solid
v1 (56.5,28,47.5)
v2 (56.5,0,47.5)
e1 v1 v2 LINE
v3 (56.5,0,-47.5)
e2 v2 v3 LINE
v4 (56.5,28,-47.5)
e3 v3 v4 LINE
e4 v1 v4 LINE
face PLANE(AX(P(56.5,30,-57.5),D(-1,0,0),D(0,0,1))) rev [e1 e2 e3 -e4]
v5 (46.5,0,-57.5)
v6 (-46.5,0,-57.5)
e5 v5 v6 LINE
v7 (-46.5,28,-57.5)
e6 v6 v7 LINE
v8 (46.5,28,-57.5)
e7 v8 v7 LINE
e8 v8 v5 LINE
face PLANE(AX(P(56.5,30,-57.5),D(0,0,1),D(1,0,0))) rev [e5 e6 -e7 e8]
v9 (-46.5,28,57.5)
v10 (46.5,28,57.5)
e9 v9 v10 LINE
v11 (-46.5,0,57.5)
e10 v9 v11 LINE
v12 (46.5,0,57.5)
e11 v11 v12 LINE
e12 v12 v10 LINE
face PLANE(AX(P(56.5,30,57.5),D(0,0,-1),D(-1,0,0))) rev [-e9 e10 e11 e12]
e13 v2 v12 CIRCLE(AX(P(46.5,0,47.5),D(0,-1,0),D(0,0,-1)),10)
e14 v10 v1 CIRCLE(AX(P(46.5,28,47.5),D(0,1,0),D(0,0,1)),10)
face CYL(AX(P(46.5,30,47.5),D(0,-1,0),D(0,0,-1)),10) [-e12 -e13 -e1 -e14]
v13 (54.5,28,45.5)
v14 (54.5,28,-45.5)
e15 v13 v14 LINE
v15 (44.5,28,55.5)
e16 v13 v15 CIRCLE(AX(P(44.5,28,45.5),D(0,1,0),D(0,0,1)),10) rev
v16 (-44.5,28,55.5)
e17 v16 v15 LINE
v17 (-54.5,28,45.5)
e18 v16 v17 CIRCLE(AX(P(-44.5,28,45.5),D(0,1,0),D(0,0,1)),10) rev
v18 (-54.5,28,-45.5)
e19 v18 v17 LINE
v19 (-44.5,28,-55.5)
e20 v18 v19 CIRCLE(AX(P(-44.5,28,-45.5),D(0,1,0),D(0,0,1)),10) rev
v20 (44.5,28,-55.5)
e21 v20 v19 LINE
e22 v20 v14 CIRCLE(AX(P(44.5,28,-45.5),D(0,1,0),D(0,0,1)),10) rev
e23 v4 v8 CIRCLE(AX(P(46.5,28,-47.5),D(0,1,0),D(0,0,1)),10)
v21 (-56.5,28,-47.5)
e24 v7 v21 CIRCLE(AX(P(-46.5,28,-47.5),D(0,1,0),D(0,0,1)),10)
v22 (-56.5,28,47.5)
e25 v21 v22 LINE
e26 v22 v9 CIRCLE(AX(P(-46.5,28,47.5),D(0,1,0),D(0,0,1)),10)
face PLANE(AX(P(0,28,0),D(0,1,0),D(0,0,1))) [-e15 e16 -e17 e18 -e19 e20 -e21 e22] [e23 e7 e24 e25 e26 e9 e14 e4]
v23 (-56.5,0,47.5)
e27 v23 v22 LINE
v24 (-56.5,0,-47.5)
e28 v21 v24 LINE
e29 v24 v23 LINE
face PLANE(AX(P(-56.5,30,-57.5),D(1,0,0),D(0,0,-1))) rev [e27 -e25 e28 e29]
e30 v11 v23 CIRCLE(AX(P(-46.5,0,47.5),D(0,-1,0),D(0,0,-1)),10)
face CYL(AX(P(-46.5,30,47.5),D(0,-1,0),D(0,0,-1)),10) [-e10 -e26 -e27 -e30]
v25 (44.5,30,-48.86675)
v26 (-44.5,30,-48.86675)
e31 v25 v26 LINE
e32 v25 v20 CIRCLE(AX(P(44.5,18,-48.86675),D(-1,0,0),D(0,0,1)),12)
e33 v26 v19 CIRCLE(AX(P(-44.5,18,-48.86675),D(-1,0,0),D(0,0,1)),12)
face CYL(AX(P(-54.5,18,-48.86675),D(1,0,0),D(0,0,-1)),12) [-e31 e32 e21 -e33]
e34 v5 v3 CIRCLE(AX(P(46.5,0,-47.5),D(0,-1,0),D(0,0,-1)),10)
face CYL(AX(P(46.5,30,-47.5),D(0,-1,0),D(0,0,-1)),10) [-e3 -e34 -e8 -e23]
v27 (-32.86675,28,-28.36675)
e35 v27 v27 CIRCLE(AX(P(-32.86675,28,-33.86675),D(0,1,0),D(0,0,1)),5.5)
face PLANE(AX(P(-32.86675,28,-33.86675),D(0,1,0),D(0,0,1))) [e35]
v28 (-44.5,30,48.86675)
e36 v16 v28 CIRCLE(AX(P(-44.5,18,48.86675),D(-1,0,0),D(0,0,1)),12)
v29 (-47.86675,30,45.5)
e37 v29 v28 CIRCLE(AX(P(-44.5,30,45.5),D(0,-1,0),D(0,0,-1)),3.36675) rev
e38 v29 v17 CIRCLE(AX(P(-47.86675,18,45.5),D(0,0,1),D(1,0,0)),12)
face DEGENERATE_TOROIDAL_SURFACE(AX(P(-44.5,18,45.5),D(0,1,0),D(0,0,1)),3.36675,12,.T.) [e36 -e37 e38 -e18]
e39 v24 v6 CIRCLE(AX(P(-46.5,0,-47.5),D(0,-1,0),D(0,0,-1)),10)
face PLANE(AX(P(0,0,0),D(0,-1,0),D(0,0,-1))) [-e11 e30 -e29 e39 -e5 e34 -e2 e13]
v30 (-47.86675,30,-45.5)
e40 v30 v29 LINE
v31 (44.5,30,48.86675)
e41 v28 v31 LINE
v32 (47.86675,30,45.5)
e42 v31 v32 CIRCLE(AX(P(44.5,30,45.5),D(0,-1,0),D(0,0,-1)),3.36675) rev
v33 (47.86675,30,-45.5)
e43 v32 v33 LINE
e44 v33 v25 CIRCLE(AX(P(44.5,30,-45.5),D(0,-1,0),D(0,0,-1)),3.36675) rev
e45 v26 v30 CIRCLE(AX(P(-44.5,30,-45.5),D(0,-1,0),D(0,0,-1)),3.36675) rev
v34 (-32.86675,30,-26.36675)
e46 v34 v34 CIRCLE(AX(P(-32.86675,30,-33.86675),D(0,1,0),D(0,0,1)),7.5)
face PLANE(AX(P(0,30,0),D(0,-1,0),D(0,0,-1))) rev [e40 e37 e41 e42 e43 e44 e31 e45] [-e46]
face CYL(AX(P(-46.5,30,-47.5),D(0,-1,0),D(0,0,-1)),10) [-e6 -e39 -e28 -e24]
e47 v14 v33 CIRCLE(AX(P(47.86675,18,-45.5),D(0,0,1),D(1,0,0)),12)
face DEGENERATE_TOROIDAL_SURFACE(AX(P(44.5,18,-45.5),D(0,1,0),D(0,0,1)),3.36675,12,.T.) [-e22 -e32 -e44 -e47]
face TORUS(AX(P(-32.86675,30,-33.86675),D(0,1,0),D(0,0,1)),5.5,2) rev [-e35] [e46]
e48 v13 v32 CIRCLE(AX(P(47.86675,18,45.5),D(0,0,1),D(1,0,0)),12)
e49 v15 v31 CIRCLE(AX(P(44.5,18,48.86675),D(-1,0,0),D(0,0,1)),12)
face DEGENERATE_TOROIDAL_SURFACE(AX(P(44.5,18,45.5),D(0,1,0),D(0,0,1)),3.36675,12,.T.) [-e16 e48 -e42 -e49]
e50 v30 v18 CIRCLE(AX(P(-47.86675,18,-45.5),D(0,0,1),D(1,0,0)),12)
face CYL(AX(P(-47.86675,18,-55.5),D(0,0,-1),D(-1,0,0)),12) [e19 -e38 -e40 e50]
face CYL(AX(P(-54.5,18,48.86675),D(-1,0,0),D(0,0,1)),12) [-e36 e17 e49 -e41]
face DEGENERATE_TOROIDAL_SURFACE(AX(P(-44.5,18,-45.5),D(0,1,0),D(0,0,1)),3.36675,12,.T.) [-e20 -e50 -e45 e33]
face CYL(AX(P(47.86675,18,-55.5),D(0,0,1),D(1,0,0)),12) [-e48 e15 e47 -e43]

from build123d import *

# Parameters (mm, degrees)
ESBO_O1_W                = 113
ESBO_O1_H                = 115
RESSALTO_EXTRUS_O1_DEPTH = 30
ESBO_O2_W                = 113
ESBO_O2_H                = 115
ESBO_O2_W_2              = 109
ESBO_O2_H_2              = 111
CORTE_EXTRUS_O1_DEPTH    = 2
FILETE1_R                = 10
FILETE2_R                = 12
ESBO_O3_R                = 7.5
CORTE_EXTRUS_O2_DEPTH    = 2
FILETE3_R                = 2


# Some blends are built 0.0001 mm under size
with BuildPart() as part:
    # Esboço1 → Ressalto-extrusão1 (new body)
    with BuildSketch(Plane(origin=(0, 0, 0), x_dir=(1, 0, 0), z_dir=(0, 1, 0))):
        Rectangle(ESBO_O1_W, ESBO_O1_H)
    extrude(amount=RESSALTO_EXTRUS_O1_DEPTH)

    # Esboço2 → Corte-extrusão1 (cut)
    with BuildSketch(Plane(origin=(0, 30, 0), x_dir=(1, 0, 0), z_dir=(0, 1, 0))):
        Rectangle(ESBO_O2_W, ESBO_O2_H)
        Rectangle(ESBO_O2_W_2, ESBO_O2_H_2, mode=Mode.SUBTRACT)
    extrude(amount=-CORTE_EXTRUS_O1_DEPTH, mode=Mode.SUBTRACT)

    # Filete1
    filete1_edges = [part.edges().sort_by_distance(p)[0] for p in [
        (-56.5, 14, -57.5),
        (56.5, 14, -57.5),
        (56.5, 14, 57.5),
        (-56.5, 14, 57.5),
        (54.5, 29, 55.5),
        (-54.5, 29, 55.5),
        (-54.5, 29, -55.5),
        (54.5, 29, -55.5),
    ]]
    fillet(filete1_edges, radius=FILETE1_R)

    # Filete2
    # the kernel refuses this fillet: 12 mm, written as the material it takes off along each edge
    with BuildSketch(Plane(origin=(44.5, 30, 55.5), x_dir=(0, -1, 0), z_dir=(-1, 0, 0)), Plane(origin=(-44.5, 30, -55.5), x_dir=(0, -1, 0), z_dir=(1, 0, 0))) as filete2_piece_1:
        with BuildLine():
            CenterArc((12, -6.633249581), FILETE2_R, 146.442690238, 33.557309762)
            Line((0, -6.633249581), (-0.24, -6.633249581))
            Line((-0.24, -6.633249581), (-0.24, 0))
            Line((-0.24, 0), (0, 0.24))
            ThreePointArc((0, 0.24), (1, 0.24), (1.8, 0.132664992))
            Line((1.8, 0.132664992), (2, 0))
        make_face()
    extrude(amount=89, mode=Mode.SUBTRACT)
    with BuildSketch(Plane(origin=(-54.5, 30, 45.5), x_dir=(0, -1, 0), z_dir=(0, 0, -1)), Plane(origin=(54.5, 30, -45.5), x_dir=(0, -1, 0), z_dir=(0, 0, 1))) as filete2_piece_2:
        with BuildLine():
            CenterArc((12, -6.633249581), FILETE2_R, 146.442690238, 33.557309762)
            Line((0, -6.633249581), (-0.24, -6.633249581))
            Line((-0.24, -6.633249581), (-0.24, 0))
            Line((-0.24, 0), (0, 0.24))
            ThreePointArc((0, 0.24), (1, 0.24), (1.8, 0.132664992))
            Line((1.8, 0.132664992), (2, 0))
        make_face()
    extrude(amount=91, mode=Mode.SUBTRACT)
    with BuildSketch(Plane(origin=(44.5, 30, -45.5), x_dir=(1, 0, 0), z_dir=(0, 0, 1))) as filete2_piece_3:
        with BuildLine():
            CenterArc((3.366750419, -12), FILETE2_R, 56.442690238, 33.557309762)
            Line((3.366750419, 0), (3.366750419, 0.24))
            Line((3.366750419, 0.24), (10, 0.24))
            Line((10, 0.24), (10.24, 0))
            ThreePointArc((10.24, 0), (10.24, -1), (10.132664992, -1.8))
            Line((10.132664992, -1.8), (10, -2))
        make_face()
    revolve(axis=Axis((44.5, 30, -45.5), (0, 1, 0)), revolution_arc=90, mode=Mode.SUBTRACT)
    with BuildSketch(Plane(origin=(44.5, 30, 45.5), x_dir=(0, 0, 1), z_dir=(-1, 0, 0))) as filete2_piece_4:
        with BuildLine():
            CenterArc((3.366750419, -12), FILETE2_R, 56.442690238, 33.557309762)
            Line((3.366750419, 0), (3.366750419, 0.24))
            Line((3.366750419, 0.24), (10, 0.24))
            Line((10, 0.24), (10.24, 0))
            ThreePointArc((10.24, 0), (10.24, -1), (10.132664992, -1.8))
            Line((10.132664992, -1.8), (10, -2))
        make_face()
    revolve(axis=Axis((44.5, 30, 45.5), (0, 1, 0)), revolution_arc=90, mode=Mode.SUBTRACT)
    with BuildSketch(Plane(origin=(-44.5, 30, -45.5), x_dir=(-1, 0, 0), z_dir=(0, 0, 1))) as filete2_piece_5:
        with BuildLine():
            CenterArc((3.366750419, 12), FILETE2_R, 270, 33.557309762)
            Line((3.366750419, 0), (3.366750419, -0.24))
            Line((3.366750419, -0.24), (10, -0.24))
            Line((10, -0.24), (10.24, 0))
            ThreePointArc((10.24, 0), (10.24, 1), (10.132664992, 1.8))
            Line((10.132664992, 1.8), (10, 2))
        make_face()
    revolve(axis=Axis((-44.5, 30, -45.5), (0, -1, 0)), revolution_arc=90, mode=Mode.SUBTRACT)
    with BuildSketch(Plane(origin=(-44.5, 30, 45.5), x_dir=(-1, 0, 0), z_dir=(0, 0, -1))) as filete2_piece_6:
        with BuildLine():
            CenterArc((3.366750419, -12), FILETE2_R, 56.442690238, 33.557309762)
            Line((3.366750419, 0), (3.366750419, 0.24))
            Line((3.366750419, 0.24), (10, 0.24))
            Line((10, 0.24), (10.24, 0))
            ThreePointArc((10.24, 0), (10.24, -1), (10.132664992, -1.8))
            Line((10.132664992, -1.8), (10, -2))
        make_face()
    revolve(axis=Axis((-44.5, 30, 45.5), (0, 1, 0)), revolution_arc=90, mode=Mode.SUBTRACT)

    # Esboço3 → Corte-extrusão2 (cut)
    with BuildSketch(Plane(origin=(0, 30, 0), x_dir=(1, 0, 0), z_dir=(0, 1, 0))):
        with Locations(Location((-32.866750419, 33.866750419, 0), (0, 0, 270))):
            Circle(ESBO_O3_R)
    extrude(amount=-CORTE_EXTRUS_O2_DEPTH, mode=Mode.SUBTRACT)

    # Filete3
    filete3_edges = [part.edges().sort_by_distance(p)[0] for p in [
        (-32.866750419, 28, -41.366750419),
    ]]
    fillet(filete3_edges, radius=FILETE3_R - 0.0001)  # a hair under: the kernel refuses the full size


solid = part.part
